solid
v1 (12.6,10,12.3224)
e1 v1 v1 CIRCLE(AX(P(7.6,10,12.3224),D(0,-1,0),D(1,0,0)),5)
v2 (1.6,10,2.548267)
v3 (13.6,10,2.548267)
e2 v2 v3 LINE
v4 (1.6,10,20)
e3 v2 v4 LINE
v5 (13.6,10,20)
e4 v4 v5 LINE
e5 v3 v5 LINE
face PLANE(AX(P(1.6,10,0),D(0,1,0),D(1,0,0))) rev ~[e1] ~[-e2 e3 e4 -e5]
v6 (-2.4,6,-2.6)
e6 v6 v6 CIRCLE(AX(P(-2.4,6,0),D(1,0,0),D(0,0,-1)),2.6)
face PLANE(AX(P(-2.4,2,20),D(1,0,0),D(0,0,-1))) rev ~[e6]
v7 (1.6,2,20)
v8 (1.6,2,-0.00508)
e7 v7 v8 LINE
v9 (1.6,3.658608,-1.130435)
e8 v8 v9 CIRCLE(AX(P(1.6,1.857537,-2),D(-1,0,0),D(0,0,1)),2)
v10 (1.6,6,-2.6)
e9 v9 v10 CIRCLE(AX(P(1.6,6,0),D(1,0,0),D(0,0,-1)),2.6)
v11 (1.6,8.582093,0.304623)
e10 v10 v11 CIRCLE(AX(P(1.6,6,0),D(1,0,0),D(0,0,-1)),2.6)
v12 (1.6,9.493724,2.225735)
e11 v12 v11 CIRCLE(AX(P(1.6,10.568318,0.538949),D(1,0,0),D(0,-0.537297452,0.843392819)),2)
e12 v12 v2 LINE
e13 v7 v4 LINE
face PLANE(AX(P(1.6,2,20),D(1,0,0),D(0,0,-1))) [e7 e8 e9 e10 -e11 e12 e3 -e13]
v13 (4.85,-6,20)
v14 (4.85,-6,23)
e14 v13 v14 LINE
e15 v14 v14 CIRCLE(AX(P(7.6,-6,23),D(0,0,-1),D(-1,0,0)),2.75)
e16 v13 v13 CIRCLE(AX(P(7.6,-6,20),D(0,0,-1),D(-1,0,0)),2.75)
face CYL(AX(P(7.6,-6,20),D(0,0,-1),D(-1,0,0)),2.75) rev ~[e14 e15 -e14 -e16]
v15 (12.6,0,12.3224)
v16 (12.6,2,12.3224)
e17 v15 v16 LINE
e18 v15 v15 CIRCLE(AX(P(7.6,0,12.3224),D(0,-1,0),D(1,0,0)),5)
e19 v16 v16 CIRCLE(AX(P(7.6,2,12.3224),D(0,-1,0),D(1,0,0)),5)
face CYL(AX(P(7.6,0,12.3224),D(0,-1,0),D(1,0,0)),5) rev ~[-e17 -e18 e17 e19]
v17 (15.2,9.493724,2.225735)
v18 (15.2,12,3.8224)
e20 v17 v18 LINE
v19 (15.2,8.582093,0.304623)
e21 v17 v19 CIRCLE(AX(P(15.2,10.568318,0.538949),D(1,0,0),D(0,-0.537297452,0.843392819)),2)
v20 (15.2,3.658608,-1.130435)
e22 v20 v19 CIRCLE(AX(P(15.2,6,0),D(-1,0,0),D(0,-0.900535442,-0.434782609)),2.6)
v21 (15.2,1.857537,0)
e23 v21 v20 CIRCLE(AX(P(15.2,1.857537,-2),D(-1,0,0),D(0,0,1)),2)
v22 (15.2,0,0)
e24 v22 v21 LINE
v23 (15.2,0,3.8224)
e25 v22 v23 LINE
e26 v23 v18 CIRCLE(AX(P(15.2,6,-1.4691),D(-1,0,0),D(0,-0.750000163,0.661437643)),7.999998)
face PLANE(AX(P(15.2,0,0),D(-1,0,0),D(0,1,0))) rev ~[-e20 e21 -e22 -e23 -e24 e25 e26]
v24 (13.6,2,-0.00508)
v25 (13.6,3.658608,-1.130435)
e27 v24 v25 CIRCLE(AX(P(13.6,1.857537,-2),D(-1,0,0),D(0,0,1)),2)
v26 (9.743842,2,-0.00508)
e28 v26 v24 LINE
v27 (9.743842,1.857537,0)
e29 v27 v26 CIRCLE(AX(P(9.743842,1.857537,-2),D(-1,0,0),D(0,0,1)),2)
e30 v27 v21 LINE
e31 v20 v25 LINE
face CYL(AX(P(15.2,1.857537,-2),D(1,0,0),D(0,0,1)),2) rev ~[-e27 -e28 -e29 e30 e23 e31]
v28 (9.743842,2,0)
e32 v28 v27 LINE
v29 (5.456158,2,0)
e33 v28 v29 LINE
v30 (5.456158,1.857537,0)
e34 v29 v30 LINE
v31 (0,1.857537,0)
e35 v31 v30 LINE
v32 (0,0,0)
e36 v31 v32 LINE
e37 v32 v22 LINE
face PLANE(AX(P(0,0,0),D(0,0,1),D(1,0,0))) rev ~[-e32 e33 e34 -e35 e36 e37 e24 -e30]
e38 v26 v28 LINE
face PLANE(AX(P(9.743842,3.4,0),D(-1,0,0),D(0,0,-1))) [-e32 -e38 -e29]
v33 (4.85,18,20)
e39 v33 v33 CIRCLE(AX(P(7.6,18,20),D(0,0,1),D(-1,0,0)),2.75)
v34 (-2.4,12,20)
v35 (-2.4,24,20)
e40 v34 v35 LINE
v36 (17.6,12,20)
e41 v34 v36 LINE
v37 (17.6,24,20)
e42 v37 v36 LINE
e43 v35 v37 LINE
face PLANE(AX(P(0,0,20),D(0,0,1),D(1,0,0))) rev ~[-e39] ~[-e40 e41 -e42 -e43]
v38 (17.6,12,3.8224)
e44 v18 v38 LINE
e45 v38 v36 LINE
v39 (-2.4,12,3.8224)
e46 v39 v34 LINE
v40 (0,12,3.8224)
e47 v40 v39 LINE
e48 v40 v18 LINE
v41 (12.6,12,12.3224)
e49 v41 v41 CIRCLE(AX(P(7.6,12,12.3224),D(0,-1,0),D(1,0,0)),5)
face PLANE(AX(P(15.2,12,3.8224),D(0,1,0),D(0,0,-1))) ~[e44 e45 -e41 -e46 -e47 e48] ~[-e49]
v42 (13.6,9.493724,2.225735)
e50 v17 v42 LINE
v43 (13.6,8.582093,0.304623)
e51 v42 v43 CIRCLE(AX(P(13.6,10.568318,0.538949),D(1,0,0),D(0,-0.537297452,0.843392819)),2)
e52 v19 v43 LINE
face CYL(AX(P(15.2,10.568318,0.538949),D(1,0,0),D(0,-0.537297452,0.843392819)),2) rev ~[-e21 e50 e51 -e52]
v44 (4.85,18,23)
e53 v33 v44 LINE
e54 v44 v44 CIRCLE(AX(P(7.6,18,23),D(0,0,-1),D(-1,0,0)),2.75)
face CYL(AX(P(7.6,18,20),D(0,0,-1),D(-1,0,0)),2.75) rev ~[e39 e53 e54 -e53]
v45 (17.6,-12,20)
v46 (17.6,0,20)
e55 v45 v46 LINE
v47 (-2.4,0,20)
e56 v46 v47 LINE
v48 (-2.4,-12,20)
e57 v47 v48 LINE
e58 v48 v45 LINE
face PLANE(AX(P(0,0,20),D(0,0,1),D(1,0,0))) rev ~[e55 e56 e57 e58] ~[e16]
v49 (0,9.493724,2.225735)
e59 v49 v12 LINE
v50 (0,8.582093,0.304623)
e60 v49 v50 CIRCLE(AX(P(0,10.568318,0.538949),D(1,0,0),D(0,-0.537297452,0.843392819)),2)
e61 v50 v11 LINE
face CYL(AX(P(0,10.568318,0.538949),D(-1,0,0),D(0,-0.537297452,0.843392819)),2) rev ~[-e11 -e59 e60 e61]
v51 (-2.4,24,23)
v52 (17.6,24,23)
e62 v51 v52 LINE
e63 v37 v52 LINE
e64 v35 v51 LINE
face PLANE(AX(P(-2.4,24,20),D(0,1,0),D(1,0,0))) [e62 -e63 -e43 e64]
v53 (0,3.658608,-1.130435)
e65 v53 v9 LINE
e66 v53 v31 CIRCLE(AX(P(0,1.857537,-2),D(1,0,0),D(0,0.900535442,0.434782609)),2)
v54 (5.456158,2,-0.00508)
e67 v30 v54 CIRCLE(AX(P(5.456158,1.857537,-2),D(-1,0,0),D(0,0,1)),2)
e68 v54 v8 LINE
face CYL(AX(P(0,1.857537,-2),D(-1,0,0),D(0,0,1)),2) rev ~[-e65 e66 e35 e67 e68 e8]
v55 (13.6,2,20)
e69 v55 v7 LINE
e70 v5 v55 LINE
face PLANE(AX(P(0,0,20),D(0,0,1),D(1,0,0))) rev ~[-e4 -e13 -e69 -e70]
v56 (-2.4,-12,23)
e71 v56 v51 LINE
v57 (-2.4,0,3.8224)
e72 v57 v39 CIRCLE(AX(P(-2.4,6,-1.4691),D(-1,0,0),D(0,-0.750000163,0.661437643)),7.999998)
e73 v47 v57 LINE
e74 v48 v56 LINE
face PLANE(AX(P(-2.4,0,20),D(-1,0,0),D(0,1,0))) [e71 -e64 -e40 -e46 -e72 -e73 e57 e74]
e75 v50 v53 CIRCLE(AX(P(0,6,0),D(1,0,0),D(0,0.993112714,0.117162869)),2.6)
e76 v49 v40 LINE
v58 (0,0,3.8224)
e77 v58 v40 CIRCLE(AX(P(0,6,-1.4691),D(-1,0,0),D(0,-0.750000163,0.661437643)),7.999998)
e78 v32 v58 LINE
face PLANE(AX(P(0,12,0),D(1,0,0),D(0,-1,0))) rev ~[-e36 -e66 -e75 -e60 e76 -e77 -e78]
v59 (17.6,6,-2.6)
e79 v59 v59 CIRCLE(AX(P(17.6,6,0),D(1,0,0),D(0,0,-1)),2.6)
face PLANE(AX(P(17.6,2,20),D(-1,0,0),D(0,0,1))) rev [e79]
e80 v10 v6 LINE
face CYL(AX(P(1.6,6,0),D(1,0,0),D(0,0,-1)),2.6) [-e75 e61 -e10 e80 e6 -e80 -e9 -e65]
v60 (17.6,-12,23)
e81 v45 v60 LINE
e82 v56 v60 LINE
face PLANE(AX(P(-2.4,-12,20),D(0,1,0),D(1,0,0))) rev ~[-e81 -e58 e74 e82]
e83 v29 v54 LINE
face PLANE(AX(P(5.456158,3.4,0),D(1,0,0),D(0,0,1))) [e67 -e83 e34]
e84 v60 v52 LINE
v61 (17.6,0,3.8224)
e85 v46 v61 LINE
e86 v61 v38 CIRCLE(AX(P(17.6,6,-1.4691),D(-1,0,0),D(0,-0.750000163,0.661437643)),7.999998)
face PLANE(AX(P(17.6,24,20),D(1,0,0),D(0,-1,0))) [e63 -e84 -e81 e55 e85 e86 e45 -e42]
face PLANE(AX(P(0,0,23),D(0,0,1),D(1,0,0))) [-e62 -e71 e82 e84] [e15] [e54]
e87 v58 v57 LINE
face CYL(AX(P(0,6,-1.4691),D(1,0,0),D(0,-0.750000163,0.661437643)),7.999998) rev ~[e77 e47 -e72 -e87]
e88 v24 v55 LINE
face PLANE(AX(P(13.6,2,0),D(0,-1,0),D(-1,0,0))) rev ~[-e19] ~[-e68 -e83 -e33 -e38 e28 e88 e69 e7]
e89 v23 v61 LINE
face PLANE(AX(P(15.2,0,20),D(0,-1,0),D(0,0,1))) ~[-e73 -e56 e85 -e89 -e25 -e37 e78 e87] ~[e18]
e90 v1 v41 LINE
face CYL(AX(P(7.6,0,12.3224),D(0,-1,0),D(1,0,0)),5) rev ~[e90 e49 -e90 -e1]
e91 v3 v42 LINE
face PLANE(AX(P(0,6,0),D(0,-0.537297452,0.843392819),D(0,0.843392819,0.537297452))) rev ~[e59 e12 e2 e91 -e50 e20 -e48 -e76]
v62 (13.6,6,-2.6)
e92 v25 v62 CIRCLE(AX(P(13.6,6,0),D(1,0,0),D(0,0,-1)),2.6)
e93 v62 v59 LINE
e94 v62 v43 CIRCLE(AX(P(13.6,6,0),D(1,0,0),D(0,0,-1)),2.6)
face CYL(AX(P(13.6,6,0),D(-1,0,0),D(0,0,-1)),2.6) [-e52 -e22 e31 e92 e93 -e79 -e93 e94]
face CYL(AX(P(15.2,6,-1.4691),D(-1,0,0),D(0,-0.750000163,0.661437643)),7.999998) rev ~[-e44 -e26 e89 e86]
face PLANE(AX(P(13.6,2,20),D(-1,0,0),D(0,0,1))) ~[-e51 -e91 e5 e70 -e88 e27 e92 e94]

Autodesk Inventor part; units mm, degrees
ref_plane "YZ Plane" through (0, 0, 0) normal (1, 0, 0) x (0, 1, 0)
sketch "Sketch1" plane through (0, 0, 0) normal (0, 0, 1) x (1, 0, 0)
  line L0 (0, 0) -> (15.2, 0)
  line L1 (15.2, 0) -> (15.2, 12)
  line L2 (15.2, 12) -> (0, 12)
  line L3 (0, 12) -> (0, 0)
  line L4 (1.6, 10) -> (13.6, 10)
  line L5 (13.6, 10) -> (13.6, 2)
  line L6 (13.6, 2) -> (1.6, 2)
  line L7 (1.6, 2) -> (1.6, 10)
  dimension "d0" = 15.2
  dimension "d1" = 12
  dimension "d2" = 1.6
  dimension "d3" = 2
  dimension "d4" = 2
  dimension "d5" = 1.6
extrude "Extrusion1" add sketch "Sketch1" along normal blind 20
sketch "Sketch2" plane through (0, 0, 0) normal (1, 0, 0) x (0, 1, 0)
  line L0 (0, 0) -> (12, 0) construction
  line L1 (6, 13.0663) -> (6, -2.0093) construction
  line L2 (0, 0) -> (0, 20) construction
  line L3 (12, 0) -> (12, 20) construction
  line L4 (6, 0) -> (12, 3.8224)
  line L5 (12, 3.8224) -> (12, 0)
  line L6 (12, 0) -> (6, 0)
  dimension "d8" = 12
  dimension "d9" = 6
  dimension "d10" = 32.5
extrude "Extrusion2" cut sketch "Sketch2" along normal through all
sketch "Sketch4" plane through (1.6, 2, 20) normal (1, 0, 0) x (0, 0, -1)
  circle A0 centre (20, 4) radius 2.6
  point P0 (20, -2)
  dimension "d14" = 5.2
extrude "Extrusion3" add sketch "Sketch4" against normal blind 4
sketch "Sketch5" plane through (0, 0, 20) normal (-1, 0, 0) x (0, 0, 1)
  line L0 (-20, 0) -> (0, 0) construction
  line L1 (0, 12) -> (0, 0) construction
  line L2 (-16.1776, 12) -> (0, 12) construction
  arc A0 (-16.1776, 0) -> (-16.1776, 12) centre (-21.4691, 6) ccw
  line L3 (-16.1776, 12) -> (0, 12)
  line L4 (0, 0) -> (-16.1776, 0)
  line L5 (0, 0) -> (0, 12)
  dimension "d17" = 8
extrude "Extrusion4" add sketch "Sketch5" along normal blind 2.4
ref_plane "Work Plane2" through (7.6, 2, 20) normal (1, 0, 0) x (0, 0, -1)
mirror "Mirror1" about plane through (7.6, 2, 20) normal (1, 0, 0) of "Extrusion3", "Extrusion4"
sketch "Sketch6" plane through (0, 0, 20) normal (0, 0, 1) x (1, 0, 0)
  line L0 (17.6, 0) -> (17.6, 12) construction
  line L1 (-2.4, 12) -> (17.6, 12) construction
  line L2 (-2.4, 0) -> (-2.4, 12) construction
  line L3 (-2.4, 0) -> (-2.4, 24)
  line L4 (-2.4, 24) -> (17.6, 24)
  line L5 (17.6, 24) -> (17.6, 0)
  line L6 (-2.4, 0) -> (-2.4, -12)
  line L7 (-2.4, -12) -> (17.6, -12)
  line L8 (17.6, -12) -> (17.6, 0)
  point P0 (0, 0)
  dimension "d21" = 12
  dimension "d22" = 12
extrude "Extrusion5" add sketch "Sketch6" along normal blind 3
sketch "Sketch7" plane through (0, 0, 0) normal (0, -1, 0) x (1, 0, 0)
  line L0 (17.6, 20) -> (-2.4, 20) construction
  line L1 (0, 0) -> (0, 3.8224) construction
  line L2 (7.6, 20) -> (7.6, -5.3429) construction
  circle A0 centre (7.6, 12.3224) radius 5
  line L3 (15.2, 3.8224) -> (0, 3.8224) construction
  dimension "d25" = 10
  dimension "d26" = 8.5
extrude "Extrusion6" cut sketch "Sketch7" against normal through all
sketch "Sketch8" plane through (0, 0, 20) normal (0, 0, -1) x (-1, 0, 0)
  line L0 (-17.6, -12) -> (2.4, -12) construction
  line L1 (2.4, -12) -> (2.4, 0) construction
  line L2 (-7.6, -12) -> (-7.6, 4.0518) construction
  circle A0 centre (-7.6, -6) radius 2.75
  point P0 (-17.6, 0)
  point P1 (0, 0)
  dimension "d29" = 12
  dimension "d30" = 6
  dimension "d31" = 5.5
extrude "Extrusion7" cut sketch "Sketch8" against normal through all
ref_plane "Work Plane3" through (0, 6, 0) normal (0, -1, 0) x (1, 0, 0)
mirror "Mirror2" about plane through (0, 6, 0) normal (0, -1, 0) of "Extrusion7"
fillet "Fillet1" radius 2 4 edges at (14.4, 8.1928, 1.397) (0.8, 8.1928, 1.397) (14.4, 3.4, 0) (0.8, 3.4, 0)
equation "\"d9\" = 0.5 * d8"
equation "\"d22\" = d21"
equation "\"d30\" = 0.5 * d29"
properties part number "chain_end_2020-back"
